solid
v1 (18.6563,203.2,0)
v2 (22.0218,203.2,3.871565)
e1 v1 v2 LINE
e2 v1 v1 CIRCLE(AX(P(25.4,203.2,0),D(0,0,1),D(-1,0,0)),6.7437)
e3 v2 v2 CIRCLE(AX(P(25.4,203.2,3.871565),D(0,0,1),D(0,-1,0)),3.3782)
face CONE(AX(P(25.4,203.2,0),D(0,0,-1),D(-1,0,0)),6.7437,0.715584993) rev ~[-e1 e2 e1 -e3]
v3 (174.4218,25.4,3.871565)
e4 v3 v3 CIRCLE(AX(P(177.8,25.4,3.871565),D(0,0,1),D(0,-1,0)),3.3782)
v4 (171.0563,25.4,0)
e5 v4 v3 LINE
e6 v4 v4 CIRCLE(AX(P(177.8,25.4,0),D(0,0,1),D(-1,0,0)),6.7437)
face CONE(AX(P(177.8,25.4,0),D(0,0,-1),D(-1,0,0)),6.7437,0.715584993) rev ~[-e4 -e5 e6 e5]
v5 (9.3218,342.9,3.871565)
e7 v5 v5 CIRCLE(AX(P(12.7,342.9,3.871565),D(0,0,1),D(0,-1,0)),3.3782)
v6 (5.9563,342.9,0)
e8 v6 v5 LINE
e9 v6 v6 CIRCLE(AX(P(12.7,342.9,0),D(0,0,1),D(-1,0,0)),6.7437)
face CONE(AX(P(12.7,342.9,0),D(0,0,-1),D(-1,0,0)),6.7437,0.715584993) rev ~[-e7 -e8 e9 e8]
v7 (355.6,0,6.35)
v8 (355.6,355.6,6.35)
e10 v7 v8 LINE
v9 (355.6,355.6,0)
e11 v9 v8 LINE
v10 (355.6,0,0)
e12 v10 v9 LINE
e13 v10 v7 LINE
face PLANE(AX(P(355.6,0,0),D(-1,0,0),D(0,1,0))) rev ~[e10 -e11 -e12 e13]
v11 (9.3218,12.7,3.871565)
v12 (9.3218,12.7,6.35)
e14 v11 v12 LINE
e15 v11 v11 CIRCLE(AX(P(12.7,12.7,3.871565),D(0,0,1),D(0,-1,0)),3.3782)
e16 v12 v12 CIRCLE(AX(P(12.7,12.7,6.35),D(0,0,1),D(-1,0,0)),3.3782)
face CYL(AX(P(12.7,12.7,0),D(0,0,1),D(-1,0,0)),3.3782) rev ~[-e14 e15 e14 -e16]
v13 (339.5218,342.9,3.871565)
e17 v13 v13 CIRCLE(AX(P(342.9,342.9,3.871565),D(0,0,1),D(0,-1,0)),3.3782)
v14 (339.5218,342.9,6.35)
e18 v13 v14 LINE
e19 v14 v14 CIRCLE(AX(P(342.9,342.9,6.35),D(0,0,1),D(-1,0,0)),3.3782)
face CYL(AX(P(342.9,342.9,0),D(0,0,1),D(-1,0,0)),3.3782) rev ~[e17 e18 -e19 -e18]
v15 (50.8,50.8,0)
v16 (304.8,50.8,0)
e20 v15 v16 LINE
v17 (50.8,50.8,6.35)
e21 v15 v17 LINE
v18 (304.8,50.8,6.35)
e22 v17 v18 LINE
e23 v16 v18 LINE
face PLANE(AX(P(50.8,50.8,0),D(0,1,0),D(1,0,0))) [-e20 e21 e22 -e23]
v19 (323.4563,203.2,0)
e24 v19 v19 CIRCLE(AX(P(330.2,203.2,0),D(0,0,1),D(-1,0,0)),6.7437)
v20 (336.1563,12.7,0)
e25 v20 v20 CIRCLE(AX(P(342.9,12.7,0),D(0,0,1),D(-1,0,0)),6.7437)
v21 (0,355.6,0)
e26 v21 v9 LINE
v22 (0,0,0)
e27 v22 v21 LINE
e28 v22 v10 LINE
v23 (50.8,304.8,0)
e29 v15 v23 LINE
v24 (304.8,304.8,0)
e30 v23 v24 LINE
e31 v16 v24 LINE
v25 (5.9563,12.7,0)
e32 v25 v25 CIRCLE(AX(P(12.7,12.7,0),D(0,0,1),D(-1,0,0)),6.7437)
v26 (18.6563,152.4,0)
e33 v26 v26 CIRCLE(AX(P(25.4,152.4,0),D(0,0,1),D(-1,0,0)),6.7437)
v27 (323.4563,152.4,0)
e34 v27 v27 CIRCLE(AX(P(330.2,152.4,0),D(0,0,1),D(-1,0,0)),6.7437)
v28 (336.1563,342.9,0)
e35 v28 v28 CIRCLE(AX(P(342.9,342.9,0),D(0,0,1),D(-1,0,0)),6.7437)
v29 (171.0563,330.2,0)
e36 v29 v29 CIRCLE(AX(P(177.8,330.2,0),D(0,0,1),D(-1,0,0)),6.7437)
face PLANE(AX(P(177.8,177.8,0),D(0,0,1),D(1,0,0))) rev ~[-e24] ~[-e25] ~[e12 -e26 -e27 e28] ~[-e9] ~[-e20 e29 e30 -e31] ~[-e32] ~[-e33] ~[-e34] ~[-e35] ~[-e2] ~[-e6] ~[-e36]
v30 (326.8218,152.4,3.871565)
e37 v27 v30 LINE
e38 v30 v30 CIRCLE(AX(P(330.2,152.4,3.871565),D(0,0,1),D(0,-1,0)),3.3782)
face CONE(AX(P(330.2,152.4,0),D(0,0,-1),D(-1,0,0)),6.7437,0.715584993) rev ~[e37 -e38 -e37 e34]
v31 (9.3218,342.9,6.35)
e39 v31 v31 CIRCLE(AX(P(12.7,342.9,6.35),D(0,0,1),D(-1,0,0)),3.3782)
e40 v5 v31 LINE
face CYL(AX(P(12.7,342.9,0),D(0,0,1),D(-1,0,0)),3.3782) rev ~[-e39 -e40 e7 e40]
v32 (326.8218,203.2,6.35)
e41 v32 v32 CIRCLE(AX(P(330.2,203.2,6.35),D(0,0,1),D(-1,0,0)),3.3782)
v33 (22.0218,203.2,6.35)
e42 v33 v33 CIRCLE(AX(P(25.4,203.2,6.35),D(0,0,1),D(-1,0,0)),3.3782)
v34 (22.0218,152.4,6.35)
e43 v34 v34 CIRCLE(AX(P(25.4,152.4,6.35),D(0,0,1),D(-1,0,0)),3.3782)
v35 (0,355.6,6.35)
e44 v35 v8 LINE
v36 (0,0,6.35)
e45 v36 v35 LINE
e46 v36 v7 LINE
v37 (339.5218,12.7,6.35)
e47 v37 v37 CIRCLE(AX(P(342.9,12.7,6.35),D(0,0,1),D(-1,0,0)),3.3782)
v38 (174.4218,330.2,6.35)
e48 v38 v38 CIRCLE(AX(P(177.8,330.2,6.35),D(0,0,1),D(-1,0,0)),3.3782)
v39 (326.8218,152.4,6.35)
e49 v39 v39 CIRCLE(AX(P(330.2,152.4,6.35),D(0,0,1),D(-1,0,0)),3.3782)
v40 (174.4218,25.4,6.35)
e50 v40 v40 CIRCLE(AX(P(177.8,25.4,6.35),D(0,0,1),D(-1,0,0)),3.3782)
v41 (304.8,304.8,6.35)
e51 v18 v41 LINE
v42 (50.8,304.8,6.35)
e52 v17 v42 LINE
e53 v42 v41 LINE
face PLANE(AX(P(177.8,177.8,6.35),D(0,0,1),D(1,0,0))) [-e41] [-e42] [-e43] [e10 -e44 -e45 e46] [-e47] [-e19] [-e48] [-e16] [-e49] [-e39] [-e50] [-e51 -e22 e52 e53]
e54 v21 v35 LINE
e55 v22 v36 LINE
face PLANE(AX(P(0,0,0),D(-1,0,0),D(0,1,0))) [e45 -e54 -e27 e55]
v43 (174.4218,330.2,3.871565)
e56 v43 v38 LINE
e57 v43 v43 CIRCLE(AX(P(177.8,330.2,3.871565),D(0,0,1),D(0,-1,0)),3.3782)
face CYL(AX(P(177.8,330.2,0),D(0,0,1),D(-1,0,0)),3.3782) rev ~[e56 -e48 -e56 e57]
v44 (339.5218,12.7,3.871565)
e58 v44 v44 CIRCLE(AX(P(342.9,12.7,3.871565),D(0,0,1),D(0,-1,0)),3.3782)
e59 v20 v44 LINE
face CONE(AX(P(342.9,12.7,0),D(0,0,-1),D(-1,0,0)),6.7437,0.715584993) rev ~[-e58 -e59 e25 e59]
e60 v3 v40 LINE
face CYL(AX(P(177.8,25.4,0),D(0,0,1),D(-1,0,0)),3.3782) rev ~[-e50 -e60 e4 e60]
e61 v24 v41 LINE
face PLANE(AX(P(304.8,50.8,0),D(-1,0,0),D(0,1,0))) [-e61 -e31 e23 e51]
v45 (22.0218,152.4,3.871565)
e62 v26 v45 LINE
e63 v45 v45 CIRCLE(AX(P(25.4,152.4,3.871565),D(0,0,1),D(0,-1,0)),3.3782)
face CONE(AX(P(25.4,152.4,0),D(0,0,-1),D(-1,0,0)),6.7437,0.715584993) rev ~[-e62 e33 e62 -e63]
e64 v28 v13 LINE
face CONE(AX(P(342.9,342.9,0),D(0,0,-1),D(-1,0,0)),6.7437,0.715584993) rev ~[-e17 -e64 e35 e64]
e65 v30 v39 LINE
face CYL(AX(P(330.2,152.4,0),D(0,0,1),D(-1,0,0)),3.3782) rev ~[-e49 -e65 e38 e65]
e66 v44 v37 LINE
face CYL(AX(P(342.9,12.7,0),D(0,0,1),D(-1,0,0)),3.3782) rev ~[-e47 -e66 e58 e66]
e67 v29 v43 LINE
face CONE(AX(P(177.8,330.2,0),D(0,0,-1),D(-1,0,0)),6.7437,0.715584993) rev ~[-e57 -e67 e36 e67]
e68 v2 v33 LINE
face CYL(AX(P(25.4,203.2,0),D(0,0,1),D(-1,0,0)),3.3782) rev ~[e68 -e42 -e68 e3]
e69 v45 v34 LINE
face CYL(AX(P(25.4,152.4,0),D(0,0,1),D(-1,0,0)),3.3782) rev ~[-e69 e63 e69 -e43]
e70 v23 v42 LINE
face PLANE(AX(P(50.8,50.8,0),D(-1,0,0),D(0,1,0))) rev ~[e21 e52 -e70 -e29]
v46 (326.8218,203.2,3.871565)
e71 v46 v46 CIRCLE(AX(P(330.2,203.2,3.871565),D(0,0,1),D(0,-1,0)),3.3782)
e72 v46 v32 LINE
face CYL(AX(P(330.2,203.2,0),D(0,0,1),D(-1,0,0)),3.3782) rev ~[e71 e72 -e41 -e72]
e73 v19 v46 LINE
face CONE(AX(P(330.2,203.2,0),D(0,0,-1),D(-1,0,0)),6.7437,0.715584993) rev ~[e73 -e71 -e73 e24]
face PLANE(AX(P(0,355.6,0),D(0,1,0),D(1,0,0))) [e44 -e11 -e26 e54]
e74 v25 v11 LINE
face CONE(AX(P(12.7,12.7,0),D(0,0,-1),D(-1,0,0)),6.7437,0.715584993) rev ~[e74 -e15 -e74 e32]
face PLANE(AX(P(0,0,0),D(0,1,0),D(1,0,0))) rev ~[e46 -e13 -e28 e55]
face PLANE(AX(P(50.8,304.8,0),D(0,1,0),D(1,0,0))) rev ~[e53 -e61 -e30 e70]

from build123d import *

# Parameters (mm, degrees)
F0_W           = 355.6
F0_H           = 355.6
F0_W_2         = 254
F0_H_2         = 254
F1_DEPTH       = 6.35
F2_D           = 6.7564
F2_DEPTH       = 26.0604
F2_CSINK_D     = 13.4874
F2_CSINK_ANGLE = 82
F2_TIP         = 2.0298273432


# Not quite as in the source:
# - a feature names something its author has since deleted; it is built from what else it names


with BuildPart() as f1:
    # F0 (on Top) → F1 (new body)
    with BuildSketch(Plane.XY):
        with Locations((177.8, 177.8)):
            Rectangle(F0_W, F0_H)
        with Locations((177.8, 177.8)):
            Rectangle(F0_W_2, F0_H_2, mode=Mode.SUBTRACT)
    extrude(amount=F1_DEPTH)

    # F2
    with Locations(Plane(origin=(0, 0, 0), x_dir=(1, 0, 0), z_dir=(0, 0, -1))):
        with Locations((12.7, -342.9), (342.9, -342.9), (342.9, -12.7), (12.7, -12.7), (177.8, -25.4), (177.8, -330.2), (25.4, -152.4), (330.2, -203.2), (330.2, -152.4), (25.4, -203.2)):
            CounterSinkHole(F2_D / 2, F2_CSINK_D / 2, depth=F2_DEPTH, counter_sink_angle=F2_CSINK_ANGLE)
            with Locations((0, 0, -(F2_DEPTH + F2_TIP / 2))):  # 118° drill point
                Cone(0, F2_D / 2, F2_TIP, mode=Mode.SUBTRACT)


solid = f1.part
